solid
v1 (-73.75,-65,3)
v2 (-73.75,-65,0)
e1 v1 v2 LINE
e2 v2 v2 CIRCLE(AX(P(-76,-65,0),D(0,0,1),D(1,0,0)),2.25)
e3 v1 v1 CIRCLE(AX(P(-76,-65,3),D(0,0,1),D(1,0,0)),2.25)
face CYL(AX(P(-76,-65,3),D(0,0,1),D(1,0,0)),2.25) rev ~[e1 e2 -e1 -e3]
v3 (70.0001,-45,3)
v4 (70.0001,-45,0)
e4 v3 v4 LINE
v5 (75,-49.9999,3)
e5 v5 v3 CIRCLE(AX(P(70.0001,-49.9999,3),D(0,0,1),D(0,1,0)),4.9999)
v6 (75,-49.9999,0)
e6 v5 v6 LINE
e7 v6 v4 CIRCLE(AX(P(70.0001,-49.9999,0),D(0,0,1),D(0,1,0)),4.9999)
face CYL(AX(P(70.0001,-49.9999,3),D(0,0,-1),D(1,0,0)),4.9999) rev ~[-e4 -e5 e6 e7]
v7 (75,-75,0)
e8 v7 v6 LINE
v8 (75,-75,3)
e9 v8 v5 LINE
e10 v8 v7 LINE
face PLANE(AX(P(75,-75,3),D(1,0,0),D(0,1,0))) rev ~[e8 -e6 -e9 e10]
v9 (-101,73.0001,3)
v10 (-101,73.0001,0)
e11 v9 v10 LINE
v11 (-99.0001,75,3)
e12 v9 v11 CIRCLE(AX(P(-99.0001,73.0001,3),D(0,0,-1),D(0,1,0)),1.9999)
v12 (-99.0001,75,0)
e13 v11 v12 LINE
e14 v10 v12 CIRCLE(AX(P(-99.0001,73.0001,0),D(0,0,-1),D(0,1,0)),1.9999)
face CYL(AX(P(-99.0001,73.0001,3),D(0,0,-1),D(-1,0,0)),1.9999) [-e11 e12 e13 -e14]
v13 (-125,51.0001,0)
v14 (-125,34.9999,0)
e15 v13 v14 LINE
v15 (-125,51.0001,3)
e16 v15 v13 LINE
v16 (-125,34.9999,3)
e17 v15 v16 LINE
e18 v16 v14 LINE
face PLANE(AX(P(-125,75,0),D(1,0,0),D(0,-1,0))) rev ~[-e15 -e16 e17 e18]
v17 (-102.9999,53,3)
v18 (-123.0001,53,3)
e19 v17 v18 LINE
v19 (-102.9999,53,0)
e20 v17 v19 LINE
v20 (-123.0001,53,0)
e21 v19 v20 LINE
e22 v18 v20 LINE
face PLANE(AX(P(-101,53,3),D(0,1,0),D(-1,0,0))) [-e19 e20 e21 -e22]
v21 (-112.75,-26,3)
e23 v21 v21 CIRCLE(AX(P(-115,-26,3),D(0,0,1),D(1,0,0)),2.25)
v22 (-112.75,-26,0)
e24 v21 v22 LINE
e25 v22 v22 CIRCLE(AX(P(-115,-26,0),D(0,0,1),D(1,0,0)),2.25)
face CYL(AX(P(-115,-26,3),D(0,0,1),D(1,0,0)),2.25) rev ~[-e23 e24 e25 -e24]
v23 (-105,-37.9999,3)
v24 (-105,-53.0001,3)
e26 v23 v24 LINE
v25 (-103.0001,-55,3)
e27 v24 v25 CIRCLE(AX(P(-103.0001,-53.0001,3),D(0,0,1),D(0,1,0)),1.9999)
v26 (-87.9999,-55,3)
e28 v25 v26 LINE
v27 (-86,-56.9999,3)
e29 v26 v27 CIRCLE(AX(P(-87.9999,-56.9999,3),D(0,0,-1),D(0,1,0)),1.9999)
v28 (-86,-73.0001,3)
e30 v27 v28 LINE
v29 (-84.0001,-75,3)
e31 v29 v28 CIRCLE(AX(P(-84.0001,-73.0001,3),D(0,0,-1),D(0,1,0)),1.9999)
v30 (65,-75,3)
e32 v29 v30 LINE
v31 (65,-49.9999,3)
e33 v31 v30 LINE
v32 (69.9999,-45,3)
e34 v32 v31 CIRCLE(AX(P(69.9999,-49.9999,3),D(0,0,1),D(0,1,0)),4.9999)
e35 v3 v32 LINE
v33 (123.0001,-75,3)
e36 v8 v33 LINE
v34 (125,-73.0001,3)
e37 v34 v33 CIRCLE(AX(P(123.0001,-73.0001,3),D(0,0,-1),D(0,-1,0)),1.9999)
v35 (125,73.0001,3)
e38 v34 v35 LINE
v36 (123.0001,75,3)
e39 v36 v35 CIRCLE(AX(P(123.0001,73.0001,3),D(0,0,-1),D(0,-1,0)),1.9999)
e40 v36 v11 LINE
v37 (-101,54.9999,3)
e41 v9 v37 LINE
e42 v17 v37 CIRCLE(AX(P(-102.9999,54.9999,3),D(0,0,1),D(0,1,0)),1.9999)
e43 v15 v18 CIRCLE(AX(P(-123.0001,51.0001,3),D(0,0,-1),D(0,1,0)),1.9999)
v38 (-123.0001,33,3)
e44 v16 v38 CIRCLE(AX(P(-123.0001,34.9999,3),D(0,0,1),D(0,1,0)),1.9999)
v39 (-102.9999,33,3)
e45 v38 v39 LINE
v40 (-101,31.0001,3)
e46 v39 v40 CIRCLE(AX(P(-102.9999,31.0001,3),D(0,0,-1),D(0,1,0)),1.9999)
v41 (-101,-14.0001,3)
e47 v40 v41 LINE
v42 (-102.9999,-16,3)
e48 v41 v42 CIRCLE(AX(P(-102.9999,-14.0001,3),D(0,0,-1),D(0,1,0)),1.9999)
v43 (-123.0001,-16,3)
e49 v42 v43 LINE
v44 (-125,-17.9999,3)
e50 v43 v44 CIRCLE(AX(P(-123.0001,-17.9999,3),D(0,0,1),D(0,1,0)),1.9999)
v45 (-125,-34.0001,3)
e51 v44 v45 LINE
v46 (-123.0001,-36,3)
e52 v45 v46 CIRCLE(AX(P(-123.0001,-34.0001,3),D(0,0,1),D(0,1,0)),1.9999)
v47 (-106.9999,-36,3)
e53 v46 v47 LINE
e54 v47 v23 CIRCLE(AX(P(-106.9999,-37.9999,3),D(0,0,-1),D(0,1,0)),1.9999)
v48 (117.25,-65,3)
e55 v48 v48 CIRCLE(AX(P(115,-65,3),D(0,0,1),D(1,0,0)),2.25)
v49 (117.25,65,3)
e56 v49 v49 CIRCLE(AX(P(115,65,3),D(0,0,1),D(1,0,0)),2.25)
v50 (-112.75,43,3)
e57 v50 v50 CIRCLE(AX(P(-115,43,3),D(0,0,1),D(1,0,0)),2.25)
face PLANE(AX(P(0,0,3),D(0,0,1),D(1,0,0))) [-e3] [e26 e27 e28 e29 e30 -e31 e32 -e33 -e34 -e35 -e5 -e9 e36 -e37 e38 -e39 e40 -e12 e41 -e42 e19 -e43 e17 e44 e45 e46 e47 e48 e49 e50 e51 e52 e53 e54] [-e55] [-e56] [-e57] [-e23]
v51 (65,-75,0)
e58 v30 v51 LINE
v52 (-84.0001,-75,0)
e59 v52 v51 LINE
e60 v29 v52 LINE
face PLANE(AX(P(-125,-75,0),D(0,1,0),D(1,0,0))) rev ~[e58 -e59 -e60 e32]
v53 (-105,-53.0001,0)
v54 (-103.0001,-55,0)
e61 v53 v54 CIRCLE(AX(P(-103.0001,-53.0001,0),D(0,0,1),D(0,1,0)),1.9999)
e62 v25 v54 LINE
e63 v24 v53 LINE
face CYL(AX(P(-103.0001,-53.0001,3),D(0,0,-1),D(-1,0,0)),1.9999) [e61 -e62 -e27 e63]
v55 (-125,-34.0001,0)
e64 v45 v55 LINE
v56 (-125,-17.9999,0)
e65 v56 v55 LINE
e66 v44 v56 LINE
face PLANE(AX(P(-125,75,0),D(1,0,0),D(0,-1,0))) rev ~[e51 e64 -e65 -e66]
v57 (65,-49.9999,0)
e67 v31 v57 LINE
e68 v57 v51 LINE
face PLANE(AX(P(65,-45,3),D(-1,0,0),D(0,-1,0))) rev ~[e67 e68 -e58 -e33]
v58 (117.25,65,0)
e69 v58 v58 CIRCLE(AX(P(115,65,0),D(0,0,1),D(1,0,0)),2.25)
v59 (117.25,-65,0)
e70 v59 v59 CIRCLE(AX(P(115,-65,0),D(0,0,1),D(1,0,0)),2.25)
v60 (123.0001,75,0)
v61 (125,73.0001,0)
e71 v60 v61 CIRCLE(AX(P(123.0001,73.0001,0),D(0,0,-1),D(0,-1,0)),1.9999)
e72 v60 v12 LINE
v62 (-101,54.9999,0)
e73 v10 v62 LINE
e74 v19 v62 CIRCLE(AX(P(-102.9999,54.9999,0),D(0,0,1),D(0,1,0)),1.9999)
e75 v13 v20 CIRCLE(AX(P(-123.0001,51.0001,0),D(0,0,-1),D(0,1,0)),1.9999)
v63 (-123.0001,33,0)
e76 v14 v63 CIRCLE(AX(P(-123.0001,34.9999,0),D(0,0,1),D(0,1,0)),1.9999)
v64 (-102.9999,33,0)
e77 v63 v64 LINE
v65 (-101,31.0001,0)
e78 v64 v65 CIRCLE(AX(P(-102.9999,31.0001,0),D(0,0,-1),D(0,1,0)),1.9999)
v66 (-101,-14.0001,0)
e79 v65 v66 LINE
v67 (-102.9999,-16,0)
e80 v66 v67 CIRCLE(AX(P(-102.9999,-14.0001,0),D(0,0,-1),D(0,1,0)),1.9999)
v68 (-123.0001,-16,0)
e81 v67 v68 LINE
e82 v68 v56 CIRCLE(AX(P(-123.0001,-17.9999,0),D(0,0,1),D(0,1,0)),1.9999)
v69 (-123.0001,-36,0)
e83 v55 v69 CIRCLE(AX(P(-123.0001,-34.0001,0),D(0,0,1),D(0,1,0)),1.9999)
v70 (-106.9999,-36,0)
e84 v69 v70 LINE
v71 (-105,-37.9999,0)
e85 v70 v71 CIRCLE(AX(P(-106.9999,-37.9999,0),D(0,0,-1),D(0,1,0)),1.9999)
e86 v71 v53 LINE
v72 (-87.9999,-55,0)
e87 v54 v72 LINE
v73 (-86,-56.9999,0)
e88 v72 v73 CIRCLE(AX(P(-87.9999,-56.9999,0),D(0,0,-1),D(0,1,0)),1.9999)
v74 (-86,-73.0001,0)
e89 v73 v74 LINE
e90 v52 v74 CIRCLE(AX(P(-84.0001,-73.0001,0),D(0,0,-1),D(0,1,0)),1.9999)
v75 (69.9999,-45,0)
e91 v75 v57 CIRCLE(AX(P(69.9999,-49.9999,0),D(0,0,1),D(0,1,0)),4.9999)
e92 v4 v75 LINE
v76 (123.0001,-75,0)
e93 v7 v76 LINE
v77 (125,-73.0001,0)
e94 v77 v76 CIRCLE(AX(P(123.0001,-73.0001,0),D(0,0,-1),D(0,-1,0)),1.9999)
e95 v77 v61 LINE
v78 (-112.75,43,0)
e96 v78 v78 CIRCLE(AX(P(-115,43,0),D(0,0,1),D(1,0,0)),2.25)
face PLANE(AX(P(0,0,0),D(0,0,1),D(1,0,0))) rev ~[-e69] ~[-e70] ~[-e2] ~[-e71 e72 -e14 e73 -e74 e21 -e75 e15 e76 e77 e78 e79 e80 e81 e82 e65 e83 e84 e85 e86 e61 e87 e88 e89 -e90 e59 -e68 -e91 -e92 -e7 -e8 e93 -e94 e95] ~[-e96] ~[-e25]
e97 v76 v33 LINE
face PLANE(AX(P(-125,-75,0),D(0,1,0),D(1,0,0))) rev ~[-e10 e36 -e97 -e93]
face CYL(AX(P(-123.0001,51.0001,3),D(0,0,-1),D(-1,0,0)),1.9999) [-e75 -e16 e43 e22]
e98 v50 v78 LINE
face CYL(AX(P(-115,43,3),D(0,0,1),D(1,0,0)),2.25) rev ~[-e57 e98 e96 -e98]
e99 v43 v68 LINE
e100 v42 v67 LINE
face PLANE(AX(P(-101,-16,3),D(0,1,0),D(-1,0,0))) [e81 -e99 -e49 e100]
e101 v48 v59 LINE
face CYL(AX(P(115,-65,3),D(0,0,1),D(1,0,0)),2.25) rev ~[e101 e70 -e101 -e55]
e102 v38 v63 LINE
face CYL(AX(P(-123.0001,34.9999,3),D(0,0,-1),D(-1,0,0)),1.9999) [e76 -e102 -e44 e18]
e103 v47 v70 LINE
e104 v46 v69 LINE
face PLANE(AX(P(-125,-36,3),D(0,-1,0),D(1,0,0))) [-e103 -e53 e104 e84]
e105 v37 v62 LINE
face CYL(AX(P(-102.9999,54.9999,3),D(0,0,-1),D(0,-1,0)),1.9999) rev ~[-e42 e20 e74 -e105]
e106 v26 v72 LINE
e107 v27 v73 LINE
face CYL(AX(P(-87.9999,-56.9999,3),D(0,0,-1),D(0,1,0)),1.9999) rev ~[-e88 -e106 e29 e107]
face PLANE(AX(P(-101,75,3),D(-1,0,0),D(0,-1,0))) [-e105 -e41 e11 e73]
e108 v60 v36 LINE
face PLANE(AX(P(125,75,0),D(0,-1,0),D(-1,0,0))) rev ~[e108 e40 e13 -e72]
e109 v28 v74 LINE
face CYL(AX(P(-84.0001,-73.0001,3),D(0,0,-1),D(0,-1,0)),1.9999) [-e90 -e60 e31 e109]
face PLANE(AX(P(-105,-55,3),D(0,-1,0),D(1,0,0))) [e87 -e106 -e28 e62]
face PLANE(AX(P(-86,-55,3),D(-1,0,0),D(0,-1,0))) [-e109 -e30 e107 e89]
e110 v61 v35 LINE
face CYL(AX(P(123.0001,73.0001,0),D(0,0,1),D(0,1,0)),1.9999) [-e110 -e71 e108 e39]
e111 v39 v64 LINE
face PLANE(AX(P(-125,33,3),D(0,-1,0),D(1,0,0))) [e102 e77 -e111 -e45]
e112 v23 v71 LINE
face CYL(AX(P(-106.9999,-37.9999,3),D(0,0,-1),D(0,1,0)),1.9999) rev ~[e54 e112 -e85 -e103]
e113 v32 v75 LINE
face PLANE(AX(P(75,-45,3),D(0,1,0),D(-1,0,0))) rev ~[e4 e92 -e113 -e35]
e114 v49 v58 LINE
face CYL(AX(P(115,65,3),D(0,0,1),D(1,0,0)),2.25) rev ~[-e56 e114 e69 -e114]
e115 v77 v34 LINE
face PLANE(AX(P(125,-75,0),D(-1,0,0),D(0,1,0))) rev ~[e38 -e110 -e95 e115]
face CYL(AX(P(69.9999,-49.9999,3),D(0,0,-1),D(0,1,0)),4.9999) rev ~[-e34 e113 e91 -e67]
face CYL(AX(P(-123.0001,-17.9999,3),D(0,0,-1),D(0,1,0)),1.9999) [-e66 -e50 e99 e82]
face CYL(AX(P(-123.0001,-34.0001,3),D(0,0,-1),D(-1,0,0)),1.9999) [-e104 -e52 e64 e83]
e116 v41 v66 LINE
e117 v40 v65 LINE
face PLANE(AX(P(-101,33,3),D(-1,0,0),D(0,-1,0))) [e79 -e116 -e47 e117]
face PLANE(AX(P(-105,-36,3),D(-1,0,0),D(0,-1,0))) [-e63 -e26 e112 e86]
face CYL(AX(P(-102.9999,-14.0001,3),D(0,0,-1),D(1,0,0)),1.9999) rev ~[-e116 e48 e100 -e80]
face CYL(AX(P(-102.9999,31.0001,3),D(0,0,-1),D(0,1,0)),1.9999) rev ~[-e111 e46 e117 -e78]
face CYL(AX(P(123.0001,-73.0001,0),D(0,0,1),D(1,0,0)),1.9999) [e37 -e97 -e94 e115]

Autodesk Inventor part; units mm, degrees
ref_plane "YZ Plane" through (0, 0, 0) normal (1, 0, 0) x (0, 1, 0)
ref_plane "XZ Plane" through (0, 0, 0) normal (0, 1, 0) x (-1, 0, 0)
ref_plane "XY Plane" through (0, 0, 0) normal (0, 0, 1) x (1, 0, 0)
sketch "Sketch1" plane through (0, 0, 0) normal (0, 0, 1) x (1, 0, 0)
  line L0 (-125, -75) -> (125, -75)
  line L1 (125, -75) -> (125, 75)
  line L2 (125, 75) -> (-125, 75)
  line L3 (-125, 75) -> (-125, -75)
  line L4 (-125, -75) -> (125, 75) construction
  line L5 (125, -75) -> (-125, 75) construction
  point P0 (0, 0)
  dimension "d0" = 150
  dimension "d1" = 250
extrude "Extrusion1" add sketch "Sketch1" along normal blind 3
sketch "Sketch2" plane through (0, 0, 3) normal (0, 0, 1) x (1, 0, 0)
  line L0 (125, -75) -> (125, 75) construction
  line L1 (125, 75) -> (-125, 75) construction
  line L2 (-125, 75) -> (-125, -75) construction
  line L3 (-125, -75) -> (125, -75) construction
  line L4 (-125, -36) -> (-105, -36)
  line L5 (-105, -36) -> (-105, -55)
  line L6 (-105, -55) -> (-86, -55)
  line L7 (-86, -55) -> (-86, -75)
  line L8 (-125, -75) -> (125, -75) construction
  line L9 (-125, 75) -> (-125, -75) construction
  line L10 (-125, -36) -> (-125, -75)
  line L11 (-86, -75) -> (-125, -75)
  line L12 (-125, 33) -> (-101, 33)
  line L13 (-101, 33) -> (-101, -16)
  line L14 (-101, -16) -> (-125, -16)
  line L15 (-125, -16) -> (-125, 33)
  line L16 (65, -75) -> (75, -75)
  line L17 (75, -75) -> (75, -45)
  line L18 (75, -45) -> (65, -45)
  line L19 (65, -45) -> (65, -75)
  line L20 (125, 75) -> (-125, 75) projected
  line L21 (-125, 75) -> (-101, 75)
  line L22 (-101, 75) -> (-101, 53)
  line L23 (-101, 53) -> (-125, 53)
  line L24 (-125, 53) -> (-125, 75)
  point P0 (0, 0)
  dimension "d4" = 39
  dimension "d5" = 39
  dimension "d6" = 20
  dimension "d7" = 20
  dimension "d9" = 24
  dimension "d11" = 20
  dimension "d13" = 10
  dimension "d14" = 30
  dimension "d36" = 50
  dimension "d37" = 22
  dimension "d39" = 42
extrude "Extrusion2" cut sketch "Sketch2" against normal blind 3
sketch "Sketch3" plane through (0, 0, 3) normal (0, 0, 1) x (1, 0, 0)
  circle A0 centre (-115, 43) radius 2.25
  circle A1 centre (-115, -26) radius 2.25
  circle A2 centre (115, 65) radius 2.25
  circle A3 centre (115, -65) radius 2.25
  circle A4 centre (-76, -65) radius 2.25
  line L0 (125, 75) -> (-125, 75) projected
  line L1 (-125, 75) -> (-125, 33) projected
  line L2 (-125, -16) -> (-125, -36) projected
  line L3 (-125, -36) -> (-105, -36) projected
  line L4 (-86, -75) -> (65, -75) projected
  line L5 (-86, -55) -> (-86, -75) projected
  line L6 (75, -75) -> (125, -75) projected
  line L7 (125, -75) -> (125, 75) projected
  line L8 (-125, 53) -> (-101, 53) projected
  point P0 (0, 0)
  dimension "d17" = 4.5
  dimension "d18" = 4.5
  dimension "d19" = 4.5
  dimension "d20" = 4.5
  dimension "d21" = 4.5
  dimension "d23" = 10
  dimension "d24" = 10
  dimension "d25" = 10
  dimension "d26" = 10
  dimension "d27" = 10
  dimension "d28" = 10
  dimension "d29" = 10
  dimension "d30" = 10
  dimension "d31" = 10
  dimension "d38" = 10
extrude "Extrusion3" cut sketch "Sketch3" against normal through all
fillet "Fillet1" radius 2 14 edges at (125, 75, 1.5) (125, -75, 1.5) (-86, -75, 1.5) (-86, -55, 1.5) (-105, -55, 1.5) (-105, -36, 1.5) (-125, -36, 1.5) (-125, -16, 1.5) (-101, -16, 1.5) (-101, 33, 1.5) (-125, 33, 1.5) (-125, 53, 1.5) (-101, 53, 1.5) (-101, 75, 1.5)
fillet "Fillet1" radius 5 2 edges at (65, -45, 1.5) (75, -45, 1.5)
sketch "Sketch4" plane through (0, 0, 3) normal (0, 0, 1) x (1, 0, 0)
  arc A0 (-99, 75) -> (-101, 73) centre (-99, 73) ccw projected
  line L0 (-101, 73) -> (-101, 55) projected
  arc A1 (-103, 53) -> (-101, 55) centre (-103, 55) ccw projected
  line L1 (-103, 53) -> (-123, 53) projected
  arc A2 (-123, 53) -> (-125, 51) centre (-123, 51) ccw projected
  line L2 (-125, 51) -> (-125, 35) projected
  arc A3 (-125, 35) -> (-123, 33) centre (-123, 35) ccw projected
  line L3 (-123, 33) -> (-103, 33) projected
  arc A4 (-101, 31) -> (-103, 33) centre (-103, 31) ccw projected
  line L4 (-101, 31) -> (-101, -14) projected
  arc A5 (-103, -16) -> (-101, -14) centre (-103, -14) ccw projected
  line L5 (-103, -16) -> (-123, -16) projected
  arc A6 (-123, -16) -> (-125, -18) centre (-123, -18) ccw projected
  line L6 (-125, -18) -> (-125, -34) projected
  arc A7 (-125, -34) -> (-123, -36) centre (-123, -34) ccw projected
  line L7 (-123, -36) -> (-107, -36) projected
  arc A8 (-105, -38) -> (-107, -36) centre (-107, -38) ccw projected
  line L8 (-105, -38) -> (-105, -53) projected
  arc A9 (-105, -53) -> (-103, -55) centre (-103, -53) ccw projected
  line L9 (-103, -55) -> (-88, -55) projected
  arc A10 (-86, -57) -> (-88, -55) centre (-88, -57) ccw projected
  line L10 (-86, -57) -> (-86, -73) projected
  arc A11 (-86, -73) -> (-84, -75) centre (-84, -73) ccw projected
  line L11 (-84, -75) -> (65, -75) projected
  line L12 (65, -75) -> (65, -50) projected
  arc A12 (75, -50) -> (65, -50) centre (70, -50) ccw projected
  line L13 (75, -50) -> (75, -75) projected
  line L14 (75, -75) -> (123, -75) projected
  arc A13 (123, -75) -> (125, -73) centre (123, -73) ccw projected
  line L15 (125, -73) -> (125, 73) projected
  arc A14 (125, 73) -> (123, 75) centre (123, 73) ccw projected
  line L16 (123, 75) -> (-99, 75) projected
  circle A15 centre (-115, 43) radius 2.25 projected
  circle A16 centre (115, 65) radius 2.25 projected
  circle A17 centre (-115, -26) radius 2.25 projected
  circle A18 centre (115, -65) radius 2.25 projected
  circle A19 centre (-76, -65) radius 2.25 projected
  point P0 (0, 0)
equation "\"d5\" = d4"
equation "\"d18\" = d17"
equation "\"d19\" = d17"
equation "\"d20\" = d17"
equation "\"d21\" = d17"
equation "\"d24\" = d23"
equation "\"d25\" = d23"
equation "\"d26\" = d25"
equation "\"d27\" = d25"
equation "\"d28\" = d26"
equation "\"d29\" = d26"
equation "\"d30\" = d23"
equation "\"d31\" = d23"
equation "\"d38\" = d23"
properties part number "SideAcrylicSheet"
